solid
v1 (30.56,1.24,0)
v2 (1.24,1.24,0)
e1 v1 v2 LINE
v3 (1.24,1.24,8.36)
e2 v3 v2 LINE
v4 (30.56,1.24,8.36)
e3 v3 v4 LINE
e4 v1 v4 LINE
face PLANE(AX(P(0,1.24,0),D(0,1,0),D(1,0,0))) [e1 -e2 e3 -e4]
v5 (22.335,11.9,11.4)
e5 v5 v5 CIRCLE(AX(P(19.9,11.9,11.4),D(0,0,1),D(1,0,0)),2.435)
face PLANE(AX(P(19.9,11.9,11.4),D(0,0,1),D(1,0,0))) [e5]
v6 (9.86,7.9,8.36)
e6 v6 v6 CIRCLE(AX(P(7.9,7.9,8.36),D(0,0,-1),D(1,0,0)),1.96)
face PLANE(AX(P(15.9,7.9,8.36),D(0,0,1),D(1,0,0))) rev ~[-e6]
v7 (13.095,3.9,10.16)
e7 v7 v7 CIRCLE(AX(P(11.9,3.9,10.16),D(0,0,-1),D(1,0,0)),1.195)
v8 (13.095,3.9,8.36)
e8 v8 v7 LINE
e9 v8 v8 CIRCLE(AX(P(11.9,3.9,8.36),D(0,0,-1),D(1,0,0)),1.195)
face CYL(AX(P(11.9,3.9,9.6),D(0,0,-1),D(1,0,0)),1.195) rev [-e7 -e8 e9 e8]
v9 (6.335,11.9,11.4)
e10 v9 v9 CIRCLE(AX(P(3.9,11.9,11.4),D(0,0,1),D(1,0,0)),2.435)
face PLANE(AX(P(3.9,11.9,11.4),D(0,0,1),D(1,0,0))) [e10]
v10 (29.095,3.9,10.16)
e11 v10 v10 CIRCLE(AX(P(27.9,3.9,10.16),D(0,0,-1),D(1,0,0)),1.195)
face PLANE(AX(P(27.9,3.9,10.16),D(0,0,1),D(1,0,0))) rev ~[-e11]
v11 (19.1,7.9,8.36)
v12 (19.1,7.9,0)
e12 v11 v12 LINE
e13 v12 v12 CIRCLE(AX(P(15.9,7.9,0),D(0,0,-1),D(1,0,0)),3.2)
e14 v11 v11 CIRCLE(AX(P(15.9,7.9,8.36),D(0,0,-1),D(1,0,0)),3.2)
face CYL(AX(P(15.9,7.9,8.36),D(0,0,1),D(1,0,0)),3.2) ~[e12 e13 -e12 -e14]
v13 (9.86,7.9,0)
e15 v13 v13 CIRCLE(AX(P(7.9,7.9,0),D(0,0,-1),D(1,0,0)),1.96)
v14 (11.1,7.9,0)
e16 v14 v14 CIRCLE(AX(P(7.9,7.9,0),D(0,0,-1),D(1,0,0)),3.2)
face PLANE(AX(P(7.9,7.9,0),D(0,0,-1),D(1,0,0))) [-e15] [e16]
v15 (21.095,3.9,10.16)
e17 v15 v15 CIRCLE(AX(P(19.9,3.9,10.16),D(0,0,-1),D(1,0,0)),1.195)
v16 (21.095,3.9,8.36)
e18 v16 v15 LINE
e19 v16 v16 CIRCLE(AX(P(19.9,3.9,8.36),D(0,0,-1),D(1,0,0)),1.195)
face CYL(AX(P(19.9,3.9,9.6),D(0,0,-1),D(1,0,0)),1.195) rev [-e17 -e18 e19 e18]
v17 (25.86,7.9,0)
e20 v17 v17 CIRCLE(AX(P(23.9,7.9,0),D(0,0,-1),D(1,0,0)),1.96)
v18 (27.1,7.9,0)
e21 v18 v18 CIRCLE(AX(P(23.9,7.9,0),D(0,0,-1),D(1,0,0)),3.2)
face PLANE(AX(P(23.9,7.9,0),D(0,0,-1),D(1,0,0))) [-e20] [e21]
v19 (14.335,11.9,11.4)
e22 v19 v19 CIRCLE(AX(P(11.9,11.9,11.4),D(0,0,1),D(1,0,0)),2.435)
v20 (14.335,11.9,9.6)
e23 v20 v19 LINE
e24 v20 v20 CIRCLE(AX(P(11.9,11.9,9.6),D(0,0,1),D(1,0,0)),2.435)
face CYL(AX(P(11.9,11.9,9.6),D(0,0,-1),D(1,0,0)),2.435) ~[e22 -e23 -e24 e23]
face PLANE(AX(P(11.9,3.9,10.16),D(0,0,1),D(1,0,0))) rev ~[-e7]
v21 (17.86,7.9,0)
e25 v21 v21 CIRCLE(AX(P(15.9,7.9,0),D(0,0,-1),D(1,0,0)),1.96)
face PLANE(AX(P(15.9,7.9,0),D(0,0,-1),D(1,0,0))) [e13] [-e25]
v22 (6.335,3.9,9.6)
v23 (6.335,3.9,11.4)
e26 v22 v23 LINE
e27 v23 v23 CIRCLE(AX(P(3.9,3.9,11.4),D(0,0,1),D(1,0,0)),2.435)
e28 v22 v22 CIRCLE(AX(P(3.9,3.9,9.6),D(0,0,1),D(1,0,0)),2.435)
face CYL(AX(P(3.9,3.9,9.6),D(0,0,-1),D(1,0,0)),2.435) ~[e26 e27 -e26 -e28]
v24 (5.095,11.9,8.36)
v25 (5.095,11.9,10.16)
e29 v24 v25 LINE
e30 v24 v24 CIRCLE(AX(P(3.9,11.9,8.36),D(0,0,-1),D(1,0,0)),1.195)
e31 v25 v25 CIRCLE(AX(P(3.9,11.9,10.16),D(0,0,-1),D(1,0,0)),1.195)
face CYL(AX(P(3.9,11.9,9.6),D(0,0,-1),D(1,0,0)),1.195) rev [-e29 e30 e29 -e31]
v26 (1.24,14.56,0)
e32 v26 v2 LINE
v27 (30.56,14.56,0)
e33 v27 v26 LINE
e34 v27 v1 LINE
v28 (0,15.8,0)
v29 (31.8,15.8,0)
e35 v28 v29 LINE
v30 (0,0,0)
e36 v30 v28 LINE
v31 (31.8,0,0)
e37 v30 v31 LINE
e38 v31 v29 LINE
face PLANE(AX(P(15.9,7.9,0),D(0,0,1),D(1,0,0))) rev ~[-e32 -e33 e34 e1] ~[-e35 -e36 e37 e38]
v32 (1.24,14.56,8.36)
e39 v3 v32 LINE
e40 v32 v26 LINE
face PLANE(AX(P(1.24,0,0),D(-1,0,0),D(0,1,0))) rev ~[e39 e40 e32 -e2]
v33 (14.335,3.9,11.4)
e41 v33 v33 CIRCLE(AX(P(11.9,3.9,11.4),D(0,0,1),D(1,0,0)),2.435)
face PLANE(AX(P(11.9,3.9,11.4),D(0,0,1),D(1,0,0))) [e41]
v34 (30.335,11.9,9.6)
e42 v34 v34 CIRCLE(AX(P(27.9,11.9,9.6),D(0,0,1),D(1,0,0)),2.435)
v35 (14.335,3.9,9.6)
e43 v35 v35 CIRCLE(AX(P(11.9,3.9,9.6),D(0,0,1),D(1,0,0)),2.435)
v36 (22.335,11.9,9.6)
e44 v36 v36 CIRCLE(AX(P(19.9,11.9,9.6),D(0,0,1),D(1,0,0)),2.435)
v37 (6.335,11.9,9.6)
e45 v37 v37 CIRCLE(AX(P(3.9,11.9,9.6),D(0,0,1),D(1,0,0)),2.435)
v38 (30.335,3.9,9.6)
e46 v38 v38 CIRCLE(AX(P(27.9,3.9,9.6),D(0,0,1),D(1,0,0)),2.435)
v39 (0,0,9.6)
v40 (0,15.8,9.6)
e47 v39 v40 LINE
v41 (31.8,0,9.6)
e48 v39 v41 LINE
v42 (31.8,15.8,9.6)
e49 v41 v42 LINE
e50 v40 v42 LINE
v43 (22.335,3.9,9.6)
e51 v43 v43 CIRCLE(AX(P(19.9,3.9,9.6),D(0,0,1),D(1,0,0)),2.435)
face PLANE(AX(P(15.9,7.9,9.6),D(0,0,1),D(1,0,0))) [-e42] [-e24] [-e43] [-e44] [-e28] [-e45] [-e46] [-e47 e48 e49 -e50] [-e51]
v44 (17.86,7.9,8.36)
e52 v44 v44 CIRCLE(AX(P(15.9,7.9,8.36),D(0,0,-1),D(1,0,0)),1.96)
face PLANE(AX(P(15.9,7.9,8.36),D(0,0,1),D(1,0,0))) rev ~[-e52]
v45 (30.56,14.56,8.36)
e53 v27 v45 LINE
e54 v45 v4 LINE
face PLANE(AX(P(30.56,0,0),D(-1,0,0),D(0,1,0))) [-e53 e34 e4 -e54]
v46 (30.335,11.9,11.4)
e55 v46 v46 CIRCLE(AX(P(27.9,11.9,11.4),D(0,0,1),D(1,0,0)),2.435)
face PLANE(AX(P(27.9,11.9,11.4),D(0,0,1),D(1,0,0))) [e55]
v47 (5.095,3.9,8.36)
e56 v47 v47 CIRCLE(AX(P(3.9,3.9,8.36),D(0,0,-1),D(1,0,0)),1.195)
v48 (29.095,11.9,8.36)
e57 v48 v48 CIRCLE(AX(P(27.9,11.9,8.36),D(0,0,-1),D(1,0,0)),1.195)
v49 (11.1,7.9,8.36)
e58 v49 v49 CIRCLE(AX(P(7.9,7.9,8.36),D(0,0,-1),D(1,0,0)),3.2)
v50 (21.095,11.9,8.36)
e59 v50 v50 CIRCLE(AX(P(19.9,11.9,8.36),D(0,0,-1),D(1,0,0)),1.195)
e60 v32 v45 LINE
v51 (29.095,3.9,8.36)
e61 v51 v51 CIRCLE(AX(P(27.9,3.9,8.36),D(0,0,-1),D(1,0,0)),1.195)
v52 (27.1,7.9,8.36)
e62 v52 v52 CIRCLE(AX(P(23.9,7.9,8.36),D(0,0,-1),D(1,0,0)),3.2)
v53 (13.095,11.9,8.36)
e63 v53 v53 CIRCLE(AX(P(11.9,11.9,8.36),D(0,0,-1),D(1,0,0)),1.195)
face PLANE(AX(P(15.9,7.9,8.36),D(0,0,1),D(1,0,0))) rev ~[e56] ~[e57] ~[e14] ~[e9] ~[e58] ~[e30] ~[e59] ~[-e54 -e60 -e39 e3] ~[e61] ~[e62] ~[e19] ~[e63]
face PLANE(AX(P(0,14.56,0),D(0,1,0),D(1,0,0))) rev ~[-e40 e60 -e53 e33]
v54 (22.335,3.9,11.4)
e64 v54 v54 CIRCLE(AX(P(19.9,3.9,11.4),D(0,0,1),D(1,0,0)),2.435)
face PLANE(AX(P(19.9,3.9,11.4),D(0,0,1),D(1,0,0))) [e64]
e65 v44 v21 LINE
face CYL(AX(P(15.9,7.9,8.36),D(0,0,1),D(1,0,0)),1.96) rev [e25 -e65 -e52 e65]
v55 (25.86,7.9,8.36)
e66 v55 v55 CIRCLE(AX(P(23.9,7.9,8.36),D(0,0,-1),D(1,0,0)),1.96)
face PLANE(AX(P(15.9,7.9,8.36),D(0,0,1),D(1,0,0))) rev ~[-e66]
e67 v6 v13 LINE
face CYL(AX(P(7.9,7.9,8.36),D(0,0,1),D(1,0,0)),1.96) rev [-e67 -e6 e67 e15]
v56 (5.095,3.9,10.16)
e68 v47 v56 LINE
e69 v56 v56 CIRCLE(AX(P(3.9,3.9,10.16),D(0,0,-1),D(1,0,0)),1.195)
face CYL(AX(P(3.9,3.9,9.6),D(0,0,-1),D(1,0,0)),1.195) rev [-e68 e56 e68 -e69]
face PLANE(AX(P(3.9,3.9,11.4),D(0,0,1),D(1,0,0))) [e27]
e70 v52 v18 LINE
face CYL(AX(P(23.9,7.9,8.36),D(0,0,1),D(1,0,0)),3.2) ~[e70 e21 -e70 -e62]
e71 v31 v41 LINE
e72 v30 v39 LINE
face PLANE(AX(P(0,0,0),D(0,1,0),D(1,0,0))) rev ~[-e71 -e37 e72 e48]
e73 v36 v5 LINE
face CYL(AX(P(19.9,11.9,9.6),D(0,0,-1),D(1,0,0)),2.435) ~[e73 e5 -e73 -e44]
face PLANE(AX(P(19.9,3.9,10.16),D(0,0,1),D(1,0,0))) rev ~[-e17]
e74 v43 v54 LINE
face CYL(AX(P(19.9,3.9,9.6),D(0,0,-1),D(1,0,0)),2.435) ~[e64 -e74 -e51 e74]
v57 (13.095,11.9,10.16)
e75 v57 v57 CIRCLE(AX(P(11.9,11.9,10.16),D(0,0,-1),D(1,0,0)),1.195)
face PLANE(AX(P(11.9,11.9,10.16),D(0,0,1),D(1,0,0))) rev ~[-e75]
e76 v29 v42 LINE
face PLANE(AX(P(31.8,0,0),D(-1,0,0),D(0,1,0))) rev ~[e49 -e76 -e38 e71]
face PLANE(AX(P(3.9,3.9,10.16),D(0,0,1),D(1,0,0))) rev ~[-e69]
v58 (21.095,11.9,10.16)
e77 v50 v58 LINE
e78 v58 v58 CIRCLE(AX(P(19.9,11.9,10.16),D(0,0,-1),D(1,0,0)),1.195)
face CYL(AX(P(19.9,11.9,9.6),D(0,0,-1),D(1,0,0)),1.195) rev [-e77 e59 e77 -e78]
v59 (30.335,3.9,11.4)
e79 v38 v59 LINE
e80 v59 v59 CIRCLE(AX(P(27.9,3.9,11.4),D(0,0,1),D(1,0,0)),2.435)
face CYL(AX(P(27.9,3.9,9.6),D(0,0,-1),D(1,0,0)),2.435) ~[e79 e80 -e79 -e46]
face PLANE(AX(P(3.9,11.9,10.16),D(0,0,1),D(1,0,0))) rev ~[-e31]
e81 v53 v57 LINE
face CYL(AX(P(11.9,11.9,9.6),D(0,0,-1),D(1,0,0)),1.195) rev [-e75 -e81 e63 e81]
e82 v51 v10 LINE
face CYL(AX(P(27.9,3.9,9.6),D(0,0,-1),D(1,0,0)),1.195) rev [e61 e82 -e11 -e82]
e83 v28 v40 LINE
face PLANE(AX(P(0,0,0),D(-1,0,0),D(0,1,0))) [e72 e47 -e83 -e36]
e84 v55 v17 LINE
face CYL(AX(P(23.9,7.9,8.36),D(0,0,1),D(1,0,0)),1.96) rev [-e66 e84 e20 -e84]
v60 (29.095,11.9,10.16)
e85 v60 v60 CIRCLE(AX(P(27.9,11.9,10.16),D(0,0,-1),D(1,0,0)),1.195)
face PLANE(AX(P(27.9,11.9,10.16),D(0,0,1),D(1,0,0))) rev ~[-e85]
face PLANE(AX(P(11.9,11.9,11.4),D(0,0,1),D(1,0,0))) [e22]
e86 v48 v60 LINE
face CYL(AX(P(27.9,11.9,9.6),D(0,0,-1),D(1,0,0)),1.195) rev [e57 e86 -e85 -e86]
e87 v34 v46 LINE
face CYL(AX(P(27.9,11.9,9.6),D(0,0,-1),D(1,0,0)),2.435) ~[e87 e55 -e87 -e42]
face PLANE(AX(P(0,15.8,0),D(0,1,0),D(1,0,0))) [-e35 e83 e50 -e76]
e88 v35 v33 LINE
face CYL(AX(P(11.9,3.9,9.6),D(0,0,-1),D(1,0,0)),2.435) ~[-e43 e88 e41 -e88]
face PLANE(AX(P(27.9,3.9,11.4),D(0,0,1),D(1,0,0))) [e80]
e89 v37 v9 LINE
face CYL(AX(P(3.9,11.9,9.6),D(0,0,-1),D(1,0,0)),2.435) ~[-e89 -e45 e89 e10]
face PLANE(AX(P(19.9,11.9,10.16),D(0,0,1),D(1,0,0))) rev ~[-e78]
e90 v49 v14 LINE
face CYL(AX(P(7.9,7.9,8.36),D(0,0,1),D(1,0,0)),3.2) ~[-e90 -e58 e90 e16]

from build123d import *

# Parameters (mm, degrees)
F0_W        = 31.8
F0_H        = 15.8
F1_DEPTH    = 9.6
F2_R        = 2.435
F3_DEPTH    = 1.8
F4_T        = -1.24
F5_R        = 3.2
F6_DEPTH    = 8.36
F7_T        = 1.24
F7_T3_DEPTH = 10.84
F7_T5_DEPTH = 15.8
F7_T7_DEPTH = 31.8


# Not quite as in the source:
# - a shell that OpenCascade refuses in one call is made with other operations: the cavity is built on its own and cut out


with BuildPart() as f1:
    # F0 (on Top) → F1 (new body)
    with BuildSketch(Plane.XY):
        with Locations((15.9, 7.9)):
            Rectangle(F0_W, F0_H)
    extrude(amount=F1_DEPTH)

    # F2 (on face) → F3 (join)
    with BuildSketch(Plane.XY.offset(9.6)):
        with Locations((3.9, 11.9)):
            Circle(F2_R)
        with Locations((11.9, 11.9)):
            Circle(F2_R)
        with Locations((19.9, 11.9)):
            Circle(F2_R)
        with Locations((27.9, 11.9)):
            Circle(F2_R)
        with Locations((27.9, 3.9)):
            Circle(F2_R)
        with Locations((19.9, 3.9)):
            Circle(F2_R)
        with Locations((11.9, 3.9)):
            Circle(F2_R)
        with Locations((3.9, 3.9)):
            Circle(F2_R)
    extrude(amount=F3_DEPTH)

    # F4
    f4_openings = [f1.faces().sort_by_distance(p)[0] for p in [
        (15.9, 7.9, 0),
    ]]
    offset(amount=F4_T, openings=f4_openings, kind=Kind.INTERSECTION)

    # F5 (on face) → F6 (join)
    with BuildSketch(Plane(origin=(0, 0, 8.36), x_dir=(1, 0, 0), z_dir=(0, 0, -1))):
        with Locations((7.9, -7.9)):
            Circle(F5_R)
        with Locations((15.9, -7.9)):
            Circle(F5_R)
        with Locations((23.9, -7.9)):
            Circle(F5_R)
    extrude(amount=F6_DEPTH)

    # F7: shell of thickness 1.24, made by hand


with BuildPart() as f7_core1:
    # F7_t2: copy of F1
    add(f1.part)

    # the walls: a layer under each face that stays
    f7_faces = [f7_core1.faces().sort_by_distance(p)[0] for p in [
        (0, 7.9, 4.8),
        (15.9, 15.8, 4.8),
        (15.9, 0, 4.8),
        (2.2714285714, 1.1285714286, 0),
        (15.9, 7.9, 9.6),
        (31.8, 7.9, 4.8),
        (1.24, 7.9, 4.18),
        (15.9, 14.56, 4.18),
        (30.56, 7.9, 4.18),
        (15.9, 1.24, 4.18),
        (1.465, 3.9, 10.5),
        (9.465, 3.9, 10.5),
        (17.465, 3.9, 10.5),
        (25.465, 3.9, 10.5),
        (1.465, 11.9, 10.5),
        (9.465, 11.9, 10.5),
        (17.465, 11.9, 10.5),
        (25.465, 11.9, 10.5),
        (6.1266666667, 3.46, 8.36),
        (3.9, 3.9, 11.4),
        (11.9, 3.9, 11.4),
        (19.9, 3.9, 11.4),
        (27.9, 3.9, 11.4),
        (3.9, 11.9, 11.4),
        (11.9, 11.9, 11.4),
        (19.9, 11.9, 11.4),
        (27.9, 11.9, 11.4),
        (2.705, 3.9, 9.26),
        (10.705, 3.9, 9.26),
        (18.705, 3.9, 9.26),
        (26.705, 3.9, 9.26),
        (4.7, 7.9, 4.18),
        (2.705, 11.9, 9.26),
        (10.705, 11.9, 9.26),
        (12.7, 7.9, 4.18),
        (20.7, 7.9, 4.18),
        (18.705, 11.9, 9.26),
        (26.705, 11.9, 9.26),
        (3.9, 3.9, 10.16),
        (11.9, 3.9, 10.16),
        (19.9, 3.9, 10.16),
        (27.9, 3.9, 10.16),
        (3.9, 11.9, 10.16),
        (11.9, 11.9, 10.16),
        (19.9, 11.9, 10.16),
        (27.9, 11.9, 10.16),
    ]]
    thicken(f7_faces, amount=-F7_T, mode=Mode.SUBTRACT)

    # F7_s4 → F7_t3 (cut)
    with BuildSketch(Plane.XY.offset(-1.24)):
        Polygon((1.2524, 14.5476), (0, 14.56), (0, 15.8), (1.24, 15.8), align=None)
        Polygon((1.2524, 1.2524), (0, 1.24), (0, 0), (1.24, 0), align=None)
        Polygon((30.5476, 14.5476), (30.56, 15.8), (31.8, 15.8), (31.8, 14.56), align=None)
        Polygon((30.5476, 1.2524), (31.8, 1.24), (31.8, 0), (30.56, 0), align=None)
    extrude(amount=F7_T3_DEPTH, mode=Mode.SUBTRACT)

    # F7_s6 → F7_t5 (cut)
    with BuildSketch(Plane.XZ.offset(-15.8)):
        Polygon((1.2524, 8.3476), (0, 8.36), (0, 9.6), (1.24, 9.6), align=None)
        Polygon((30.5476, 8.3476), (31.8, 8.36), (31.8, 9.6), (30.56, 9.6), align=None)
    extrude(amount=F7_T5_DEPTH, mode=Mode.SUBTRACT)

    # F7_s8 → F7_t7 (cut)
    with BuildSketch(Plane.YZ):
        Polygon((14.5476, 8.3476), (15.8, 8.36), (15.8, 9.6), (14.56, 9.6), align=None)
        Polygon((1.2524, 8.3476), (0, 8.36), (0, 9.6), (1.24, 9.6), align=None)
    extrude(amount=F7_T7_DEPTH, mode=Mode.SUBTRACT)

    # F7_s9 → F7_t10 (revolve, cut)
    with BuildSketch(Plane.XZ.offset(-3.9)):
        Polygon((6.3474, 9.6124), (6.335, 8.36), (5.095, 8.36), (5.095, 9.6), align=None)
    revolve(axis=Axis((3.9, 3.9, 9.6), (0, 0, 1)), mode=Mode.SUBTRACT)

    # F7_s11 → F7_t12 (revolve, cut)
    with BuildSketch(Plane.XZ.offset(-3.9)):
        Polygon((14.3474, 9.6124), (14.335, 8.36), (13.095, 8.36), (13.095, 9.6), align=None)
    revolve(axis=Axis((11.9, 3.9, 9.6), (0, 0, 1)), mode=Mode.SUBTRACT)

    # F7_s13 → F7_t14 (revolve, cut)
    with BuildSketch(Plane.XZ.offset(-3.9)):
        Polygon((22.3474, 9.6124), (22.335, 8.36), (21.095, 8.36), (21.095, 9.6), align=None)
    revolve(axis=Axis((19.9, 3.9, 9.6), (0, 0, 1)), mode=Mode.SUBTRACT)

    # F7_s15 → F7_t16 (revolve, cut)
    with BuildSketch(Plane.XZ.offset(-3.9)):
        Polygon((30.3474, 9.6124), (30.335, 8.36), (29.095, 8.36), (29.095, 9.6), align=None)
    revolve(axis=Axis((27.9, 3.9, 9.6), (0, 0, 1)), mode=Mode.SUBTRACT)

    # F7_s17 → F7_t18 (revolve, cut)
    with BuildSketch(Plane.XZ.offset(-11.9)):
        Polygon((6.3474, 9.6124), (6.335, 8.36), (5.095, 8.36), (5.095, 9.6), align=None)
    revolve(axis=Axis((3.9, 11.9, 9.6), (0, 0, 1)), mode=Mode.SUBTRACT)

    # F7_s19 → F7_t20 (revolve, cut)
    with BuildSketch(Plane.XZ.offset(-11.9)):
        Polygon((14.3474, 9.6124), (14.335, 8.36), (13.095, 8.36), (13.095, 9.6), align=None)
    revolve(axis=Axis((11.9, 11.9, 9.6), (0, 0, 1)), mode=Mode.SUBTRACT)

    # F7_s21 → F7_t22 (revolve, cut)
    with BuildSketch(Plane.XZ.offset(-11.9)):
        Polygon((22.3474, 9.6124), (22.335, 8.36), (21.095, 8.36), (21.095, 9.6), align=None)
    revolve(axis=Axis((19.9, 11.9, 9.6), (0, 0, 1)), mode=Mode.SUBTRACT)

    # F7_s23 → F7_t24 (revolve, cut)
    with BuildSketch(Plane.XZ.offset(-11.9)):
        Polygon((30.3474, 9.6124), (30.335, 8.36), (29.095, 8.36), (29.095, 9.6), align=None)
    revolve(axis=Axis((27.9, 11.9, 9.6), (0, 0, 1)), mode=Mode.SUBTRACT)

    # F7_s25 → F7_t26 (revolve, cut)
    with BuildSketch(Plane.XZ.offset(-7.9)):
        Polygon((11.1124, 8.3476), (11.1, 9.6), (9.86, 9.6), (9.86, 8.36), align=None)
    revolve(axis=Axis((7.9, 7.9, 8.36), (0, 0, -1)), mode=Mode.SUBTRACT)

    # F7_s27 → F7_t28 (revolve, cut)
    with BuildSketch(Plane.XZ.offset(-7.9)):
        Polygon((19.1124, 8.3476), (19.1, 9.6), (17.86, 9.6), (17.86, 8.36), align=None)
    revolve(axis=Axis((15.9, 7.9, 8.36), (0, 0, -1)), mode=Mode.SUBTRACT)

    # F7_s29 → F7_t30 (revolve, cut)
    with BuildSketch(Plane.XZ.offset(-7.9)):
        Polygon((27.1124, 8.3476), (27.1, 9.6), (25.86, 9.6), (25.86, 8.36), align=None)
    revolve(axis=Axis((23.9, 7.9, 8.36), (0, 0, -1)), mode=Mode.SUBTRACT)

    # F7_s31 → F7_t32 (revolve, cut)
    with BuildSketch(Plane.XZ.offset(-3.9)):
        Polygon((5.0826, 10.1476), (6.335, 10.16), (6.335, 11.4), (5.095, 11.4), align=None)
    revolve(axis=Axis((3.9, 3.9, 10.16), (0, 0, -1)), mode=Mode.SUBTRACT)

    # F7_s33 → F7_t34 (revolve, cut)
    with BuildSketch(Plane.XZ.offset(-3.9)):
        Polygon((13.0826, 10.1476), (14.335, 10.16), (14.335, 11.4), (13.095, 11.4), align=None)
    revolve(axis=Axis((11.9, 3.9, 10.16), (0, 0, -1)), mode=Mode.SUBTRACT)

    # F7_s35 → F7_t36 (revolve, cut)
    with BuildSketch(Plane.XZ.offset(-3.9)):
        Polygon((21.0826, 10.1476), (22.335, 10.16), (22.335, 11.4), (21.095, 11.4), align=None)
    revolve(axis=Axis((19.9, 3.9, 10.16), (0, 0, -1)), mode=Mode.SUBTRACT)

    # F7_s37 → F7_t38 (revolve, cut)
    with BuildSketch(Plane.XZ.offset(-3.9)):
        Polygon((29.0826, 10.1476), (30.335, 10.16), (30.335, 11.4), (29.095, 11.4), align=None)
    revolve(axis=Axis((27.9, 3.9, 10.16), (0, 0, -1)), mode=Mode.SUBTRACT)

    # F7_s39 → F7_t40 (revolve, cut)
    with BuildSketch(Plane.XZ.offset(-11.9)):
        Polygon((5.0826, 10.1476), (6.335, 10.16), (6.335, 11.4), (5.095, 11.4), align=None)
    revolve(axis=Axis((3.9, 11.9, 10.16), (0, 0, -1)), mode=Mode.SUBTRACT)

    # F7_s41 → F7_t42 (revolve, cut)
    with BuildSketch(Plane.XZ.offset(-11.9)):
        Polygon((13.0826, 10.1476), (14.335, 10.16), (14.335, 11.4), (13.095, 11.4), align=None)
    revolve(axis=Axis((11.9, 11.9, 10.16), (0, 0, -1)), mode=Mode.SUBTRACT)

    # F7_s43 → F7_t44 (revolve, cut)
    with BuildSketch(Plane.XZ.offset(-11.9)):
        Polygon((21.0826, 10.1476), (22.335, 10.16), (22.335, 11.4), (21.095, 11.4), align=None)
    revolve(axis=Axis((19.9, 11.9, 10.16), (0, 0, -1)), mode=Mode.SUBTRACT)

    # F7_s45 → F7_t46 (revolve, cut)
    with BuildSketch(Plane.XZ.offset(-11.9)):
        Polygon((29.0826, 10.1476), (30.335, 10.16), (30.335, 11.4), (29.095, 11.4), align=None)
    revolve(axis=Axis((27.9, 11.9, 10.16), (0, 0, -1)), mode=Mode.SUBTRACT)


with BuildPart() as f1_1:
    add(f1.part)

    # what is left inside the walls is the cavity
    f7_cavity = [f7_core1.part.solids().sort_by_distance(p)[0] for p in [
        (5.9524, 7.9, 2.786667),
        (13.9524, 7.9, 2.786667),
        (21.9524, 7.9, 2.786667),
    ]]
    add(f7_cavity, mode=Mode.SUBTRACT)


solid = f1_1.part
